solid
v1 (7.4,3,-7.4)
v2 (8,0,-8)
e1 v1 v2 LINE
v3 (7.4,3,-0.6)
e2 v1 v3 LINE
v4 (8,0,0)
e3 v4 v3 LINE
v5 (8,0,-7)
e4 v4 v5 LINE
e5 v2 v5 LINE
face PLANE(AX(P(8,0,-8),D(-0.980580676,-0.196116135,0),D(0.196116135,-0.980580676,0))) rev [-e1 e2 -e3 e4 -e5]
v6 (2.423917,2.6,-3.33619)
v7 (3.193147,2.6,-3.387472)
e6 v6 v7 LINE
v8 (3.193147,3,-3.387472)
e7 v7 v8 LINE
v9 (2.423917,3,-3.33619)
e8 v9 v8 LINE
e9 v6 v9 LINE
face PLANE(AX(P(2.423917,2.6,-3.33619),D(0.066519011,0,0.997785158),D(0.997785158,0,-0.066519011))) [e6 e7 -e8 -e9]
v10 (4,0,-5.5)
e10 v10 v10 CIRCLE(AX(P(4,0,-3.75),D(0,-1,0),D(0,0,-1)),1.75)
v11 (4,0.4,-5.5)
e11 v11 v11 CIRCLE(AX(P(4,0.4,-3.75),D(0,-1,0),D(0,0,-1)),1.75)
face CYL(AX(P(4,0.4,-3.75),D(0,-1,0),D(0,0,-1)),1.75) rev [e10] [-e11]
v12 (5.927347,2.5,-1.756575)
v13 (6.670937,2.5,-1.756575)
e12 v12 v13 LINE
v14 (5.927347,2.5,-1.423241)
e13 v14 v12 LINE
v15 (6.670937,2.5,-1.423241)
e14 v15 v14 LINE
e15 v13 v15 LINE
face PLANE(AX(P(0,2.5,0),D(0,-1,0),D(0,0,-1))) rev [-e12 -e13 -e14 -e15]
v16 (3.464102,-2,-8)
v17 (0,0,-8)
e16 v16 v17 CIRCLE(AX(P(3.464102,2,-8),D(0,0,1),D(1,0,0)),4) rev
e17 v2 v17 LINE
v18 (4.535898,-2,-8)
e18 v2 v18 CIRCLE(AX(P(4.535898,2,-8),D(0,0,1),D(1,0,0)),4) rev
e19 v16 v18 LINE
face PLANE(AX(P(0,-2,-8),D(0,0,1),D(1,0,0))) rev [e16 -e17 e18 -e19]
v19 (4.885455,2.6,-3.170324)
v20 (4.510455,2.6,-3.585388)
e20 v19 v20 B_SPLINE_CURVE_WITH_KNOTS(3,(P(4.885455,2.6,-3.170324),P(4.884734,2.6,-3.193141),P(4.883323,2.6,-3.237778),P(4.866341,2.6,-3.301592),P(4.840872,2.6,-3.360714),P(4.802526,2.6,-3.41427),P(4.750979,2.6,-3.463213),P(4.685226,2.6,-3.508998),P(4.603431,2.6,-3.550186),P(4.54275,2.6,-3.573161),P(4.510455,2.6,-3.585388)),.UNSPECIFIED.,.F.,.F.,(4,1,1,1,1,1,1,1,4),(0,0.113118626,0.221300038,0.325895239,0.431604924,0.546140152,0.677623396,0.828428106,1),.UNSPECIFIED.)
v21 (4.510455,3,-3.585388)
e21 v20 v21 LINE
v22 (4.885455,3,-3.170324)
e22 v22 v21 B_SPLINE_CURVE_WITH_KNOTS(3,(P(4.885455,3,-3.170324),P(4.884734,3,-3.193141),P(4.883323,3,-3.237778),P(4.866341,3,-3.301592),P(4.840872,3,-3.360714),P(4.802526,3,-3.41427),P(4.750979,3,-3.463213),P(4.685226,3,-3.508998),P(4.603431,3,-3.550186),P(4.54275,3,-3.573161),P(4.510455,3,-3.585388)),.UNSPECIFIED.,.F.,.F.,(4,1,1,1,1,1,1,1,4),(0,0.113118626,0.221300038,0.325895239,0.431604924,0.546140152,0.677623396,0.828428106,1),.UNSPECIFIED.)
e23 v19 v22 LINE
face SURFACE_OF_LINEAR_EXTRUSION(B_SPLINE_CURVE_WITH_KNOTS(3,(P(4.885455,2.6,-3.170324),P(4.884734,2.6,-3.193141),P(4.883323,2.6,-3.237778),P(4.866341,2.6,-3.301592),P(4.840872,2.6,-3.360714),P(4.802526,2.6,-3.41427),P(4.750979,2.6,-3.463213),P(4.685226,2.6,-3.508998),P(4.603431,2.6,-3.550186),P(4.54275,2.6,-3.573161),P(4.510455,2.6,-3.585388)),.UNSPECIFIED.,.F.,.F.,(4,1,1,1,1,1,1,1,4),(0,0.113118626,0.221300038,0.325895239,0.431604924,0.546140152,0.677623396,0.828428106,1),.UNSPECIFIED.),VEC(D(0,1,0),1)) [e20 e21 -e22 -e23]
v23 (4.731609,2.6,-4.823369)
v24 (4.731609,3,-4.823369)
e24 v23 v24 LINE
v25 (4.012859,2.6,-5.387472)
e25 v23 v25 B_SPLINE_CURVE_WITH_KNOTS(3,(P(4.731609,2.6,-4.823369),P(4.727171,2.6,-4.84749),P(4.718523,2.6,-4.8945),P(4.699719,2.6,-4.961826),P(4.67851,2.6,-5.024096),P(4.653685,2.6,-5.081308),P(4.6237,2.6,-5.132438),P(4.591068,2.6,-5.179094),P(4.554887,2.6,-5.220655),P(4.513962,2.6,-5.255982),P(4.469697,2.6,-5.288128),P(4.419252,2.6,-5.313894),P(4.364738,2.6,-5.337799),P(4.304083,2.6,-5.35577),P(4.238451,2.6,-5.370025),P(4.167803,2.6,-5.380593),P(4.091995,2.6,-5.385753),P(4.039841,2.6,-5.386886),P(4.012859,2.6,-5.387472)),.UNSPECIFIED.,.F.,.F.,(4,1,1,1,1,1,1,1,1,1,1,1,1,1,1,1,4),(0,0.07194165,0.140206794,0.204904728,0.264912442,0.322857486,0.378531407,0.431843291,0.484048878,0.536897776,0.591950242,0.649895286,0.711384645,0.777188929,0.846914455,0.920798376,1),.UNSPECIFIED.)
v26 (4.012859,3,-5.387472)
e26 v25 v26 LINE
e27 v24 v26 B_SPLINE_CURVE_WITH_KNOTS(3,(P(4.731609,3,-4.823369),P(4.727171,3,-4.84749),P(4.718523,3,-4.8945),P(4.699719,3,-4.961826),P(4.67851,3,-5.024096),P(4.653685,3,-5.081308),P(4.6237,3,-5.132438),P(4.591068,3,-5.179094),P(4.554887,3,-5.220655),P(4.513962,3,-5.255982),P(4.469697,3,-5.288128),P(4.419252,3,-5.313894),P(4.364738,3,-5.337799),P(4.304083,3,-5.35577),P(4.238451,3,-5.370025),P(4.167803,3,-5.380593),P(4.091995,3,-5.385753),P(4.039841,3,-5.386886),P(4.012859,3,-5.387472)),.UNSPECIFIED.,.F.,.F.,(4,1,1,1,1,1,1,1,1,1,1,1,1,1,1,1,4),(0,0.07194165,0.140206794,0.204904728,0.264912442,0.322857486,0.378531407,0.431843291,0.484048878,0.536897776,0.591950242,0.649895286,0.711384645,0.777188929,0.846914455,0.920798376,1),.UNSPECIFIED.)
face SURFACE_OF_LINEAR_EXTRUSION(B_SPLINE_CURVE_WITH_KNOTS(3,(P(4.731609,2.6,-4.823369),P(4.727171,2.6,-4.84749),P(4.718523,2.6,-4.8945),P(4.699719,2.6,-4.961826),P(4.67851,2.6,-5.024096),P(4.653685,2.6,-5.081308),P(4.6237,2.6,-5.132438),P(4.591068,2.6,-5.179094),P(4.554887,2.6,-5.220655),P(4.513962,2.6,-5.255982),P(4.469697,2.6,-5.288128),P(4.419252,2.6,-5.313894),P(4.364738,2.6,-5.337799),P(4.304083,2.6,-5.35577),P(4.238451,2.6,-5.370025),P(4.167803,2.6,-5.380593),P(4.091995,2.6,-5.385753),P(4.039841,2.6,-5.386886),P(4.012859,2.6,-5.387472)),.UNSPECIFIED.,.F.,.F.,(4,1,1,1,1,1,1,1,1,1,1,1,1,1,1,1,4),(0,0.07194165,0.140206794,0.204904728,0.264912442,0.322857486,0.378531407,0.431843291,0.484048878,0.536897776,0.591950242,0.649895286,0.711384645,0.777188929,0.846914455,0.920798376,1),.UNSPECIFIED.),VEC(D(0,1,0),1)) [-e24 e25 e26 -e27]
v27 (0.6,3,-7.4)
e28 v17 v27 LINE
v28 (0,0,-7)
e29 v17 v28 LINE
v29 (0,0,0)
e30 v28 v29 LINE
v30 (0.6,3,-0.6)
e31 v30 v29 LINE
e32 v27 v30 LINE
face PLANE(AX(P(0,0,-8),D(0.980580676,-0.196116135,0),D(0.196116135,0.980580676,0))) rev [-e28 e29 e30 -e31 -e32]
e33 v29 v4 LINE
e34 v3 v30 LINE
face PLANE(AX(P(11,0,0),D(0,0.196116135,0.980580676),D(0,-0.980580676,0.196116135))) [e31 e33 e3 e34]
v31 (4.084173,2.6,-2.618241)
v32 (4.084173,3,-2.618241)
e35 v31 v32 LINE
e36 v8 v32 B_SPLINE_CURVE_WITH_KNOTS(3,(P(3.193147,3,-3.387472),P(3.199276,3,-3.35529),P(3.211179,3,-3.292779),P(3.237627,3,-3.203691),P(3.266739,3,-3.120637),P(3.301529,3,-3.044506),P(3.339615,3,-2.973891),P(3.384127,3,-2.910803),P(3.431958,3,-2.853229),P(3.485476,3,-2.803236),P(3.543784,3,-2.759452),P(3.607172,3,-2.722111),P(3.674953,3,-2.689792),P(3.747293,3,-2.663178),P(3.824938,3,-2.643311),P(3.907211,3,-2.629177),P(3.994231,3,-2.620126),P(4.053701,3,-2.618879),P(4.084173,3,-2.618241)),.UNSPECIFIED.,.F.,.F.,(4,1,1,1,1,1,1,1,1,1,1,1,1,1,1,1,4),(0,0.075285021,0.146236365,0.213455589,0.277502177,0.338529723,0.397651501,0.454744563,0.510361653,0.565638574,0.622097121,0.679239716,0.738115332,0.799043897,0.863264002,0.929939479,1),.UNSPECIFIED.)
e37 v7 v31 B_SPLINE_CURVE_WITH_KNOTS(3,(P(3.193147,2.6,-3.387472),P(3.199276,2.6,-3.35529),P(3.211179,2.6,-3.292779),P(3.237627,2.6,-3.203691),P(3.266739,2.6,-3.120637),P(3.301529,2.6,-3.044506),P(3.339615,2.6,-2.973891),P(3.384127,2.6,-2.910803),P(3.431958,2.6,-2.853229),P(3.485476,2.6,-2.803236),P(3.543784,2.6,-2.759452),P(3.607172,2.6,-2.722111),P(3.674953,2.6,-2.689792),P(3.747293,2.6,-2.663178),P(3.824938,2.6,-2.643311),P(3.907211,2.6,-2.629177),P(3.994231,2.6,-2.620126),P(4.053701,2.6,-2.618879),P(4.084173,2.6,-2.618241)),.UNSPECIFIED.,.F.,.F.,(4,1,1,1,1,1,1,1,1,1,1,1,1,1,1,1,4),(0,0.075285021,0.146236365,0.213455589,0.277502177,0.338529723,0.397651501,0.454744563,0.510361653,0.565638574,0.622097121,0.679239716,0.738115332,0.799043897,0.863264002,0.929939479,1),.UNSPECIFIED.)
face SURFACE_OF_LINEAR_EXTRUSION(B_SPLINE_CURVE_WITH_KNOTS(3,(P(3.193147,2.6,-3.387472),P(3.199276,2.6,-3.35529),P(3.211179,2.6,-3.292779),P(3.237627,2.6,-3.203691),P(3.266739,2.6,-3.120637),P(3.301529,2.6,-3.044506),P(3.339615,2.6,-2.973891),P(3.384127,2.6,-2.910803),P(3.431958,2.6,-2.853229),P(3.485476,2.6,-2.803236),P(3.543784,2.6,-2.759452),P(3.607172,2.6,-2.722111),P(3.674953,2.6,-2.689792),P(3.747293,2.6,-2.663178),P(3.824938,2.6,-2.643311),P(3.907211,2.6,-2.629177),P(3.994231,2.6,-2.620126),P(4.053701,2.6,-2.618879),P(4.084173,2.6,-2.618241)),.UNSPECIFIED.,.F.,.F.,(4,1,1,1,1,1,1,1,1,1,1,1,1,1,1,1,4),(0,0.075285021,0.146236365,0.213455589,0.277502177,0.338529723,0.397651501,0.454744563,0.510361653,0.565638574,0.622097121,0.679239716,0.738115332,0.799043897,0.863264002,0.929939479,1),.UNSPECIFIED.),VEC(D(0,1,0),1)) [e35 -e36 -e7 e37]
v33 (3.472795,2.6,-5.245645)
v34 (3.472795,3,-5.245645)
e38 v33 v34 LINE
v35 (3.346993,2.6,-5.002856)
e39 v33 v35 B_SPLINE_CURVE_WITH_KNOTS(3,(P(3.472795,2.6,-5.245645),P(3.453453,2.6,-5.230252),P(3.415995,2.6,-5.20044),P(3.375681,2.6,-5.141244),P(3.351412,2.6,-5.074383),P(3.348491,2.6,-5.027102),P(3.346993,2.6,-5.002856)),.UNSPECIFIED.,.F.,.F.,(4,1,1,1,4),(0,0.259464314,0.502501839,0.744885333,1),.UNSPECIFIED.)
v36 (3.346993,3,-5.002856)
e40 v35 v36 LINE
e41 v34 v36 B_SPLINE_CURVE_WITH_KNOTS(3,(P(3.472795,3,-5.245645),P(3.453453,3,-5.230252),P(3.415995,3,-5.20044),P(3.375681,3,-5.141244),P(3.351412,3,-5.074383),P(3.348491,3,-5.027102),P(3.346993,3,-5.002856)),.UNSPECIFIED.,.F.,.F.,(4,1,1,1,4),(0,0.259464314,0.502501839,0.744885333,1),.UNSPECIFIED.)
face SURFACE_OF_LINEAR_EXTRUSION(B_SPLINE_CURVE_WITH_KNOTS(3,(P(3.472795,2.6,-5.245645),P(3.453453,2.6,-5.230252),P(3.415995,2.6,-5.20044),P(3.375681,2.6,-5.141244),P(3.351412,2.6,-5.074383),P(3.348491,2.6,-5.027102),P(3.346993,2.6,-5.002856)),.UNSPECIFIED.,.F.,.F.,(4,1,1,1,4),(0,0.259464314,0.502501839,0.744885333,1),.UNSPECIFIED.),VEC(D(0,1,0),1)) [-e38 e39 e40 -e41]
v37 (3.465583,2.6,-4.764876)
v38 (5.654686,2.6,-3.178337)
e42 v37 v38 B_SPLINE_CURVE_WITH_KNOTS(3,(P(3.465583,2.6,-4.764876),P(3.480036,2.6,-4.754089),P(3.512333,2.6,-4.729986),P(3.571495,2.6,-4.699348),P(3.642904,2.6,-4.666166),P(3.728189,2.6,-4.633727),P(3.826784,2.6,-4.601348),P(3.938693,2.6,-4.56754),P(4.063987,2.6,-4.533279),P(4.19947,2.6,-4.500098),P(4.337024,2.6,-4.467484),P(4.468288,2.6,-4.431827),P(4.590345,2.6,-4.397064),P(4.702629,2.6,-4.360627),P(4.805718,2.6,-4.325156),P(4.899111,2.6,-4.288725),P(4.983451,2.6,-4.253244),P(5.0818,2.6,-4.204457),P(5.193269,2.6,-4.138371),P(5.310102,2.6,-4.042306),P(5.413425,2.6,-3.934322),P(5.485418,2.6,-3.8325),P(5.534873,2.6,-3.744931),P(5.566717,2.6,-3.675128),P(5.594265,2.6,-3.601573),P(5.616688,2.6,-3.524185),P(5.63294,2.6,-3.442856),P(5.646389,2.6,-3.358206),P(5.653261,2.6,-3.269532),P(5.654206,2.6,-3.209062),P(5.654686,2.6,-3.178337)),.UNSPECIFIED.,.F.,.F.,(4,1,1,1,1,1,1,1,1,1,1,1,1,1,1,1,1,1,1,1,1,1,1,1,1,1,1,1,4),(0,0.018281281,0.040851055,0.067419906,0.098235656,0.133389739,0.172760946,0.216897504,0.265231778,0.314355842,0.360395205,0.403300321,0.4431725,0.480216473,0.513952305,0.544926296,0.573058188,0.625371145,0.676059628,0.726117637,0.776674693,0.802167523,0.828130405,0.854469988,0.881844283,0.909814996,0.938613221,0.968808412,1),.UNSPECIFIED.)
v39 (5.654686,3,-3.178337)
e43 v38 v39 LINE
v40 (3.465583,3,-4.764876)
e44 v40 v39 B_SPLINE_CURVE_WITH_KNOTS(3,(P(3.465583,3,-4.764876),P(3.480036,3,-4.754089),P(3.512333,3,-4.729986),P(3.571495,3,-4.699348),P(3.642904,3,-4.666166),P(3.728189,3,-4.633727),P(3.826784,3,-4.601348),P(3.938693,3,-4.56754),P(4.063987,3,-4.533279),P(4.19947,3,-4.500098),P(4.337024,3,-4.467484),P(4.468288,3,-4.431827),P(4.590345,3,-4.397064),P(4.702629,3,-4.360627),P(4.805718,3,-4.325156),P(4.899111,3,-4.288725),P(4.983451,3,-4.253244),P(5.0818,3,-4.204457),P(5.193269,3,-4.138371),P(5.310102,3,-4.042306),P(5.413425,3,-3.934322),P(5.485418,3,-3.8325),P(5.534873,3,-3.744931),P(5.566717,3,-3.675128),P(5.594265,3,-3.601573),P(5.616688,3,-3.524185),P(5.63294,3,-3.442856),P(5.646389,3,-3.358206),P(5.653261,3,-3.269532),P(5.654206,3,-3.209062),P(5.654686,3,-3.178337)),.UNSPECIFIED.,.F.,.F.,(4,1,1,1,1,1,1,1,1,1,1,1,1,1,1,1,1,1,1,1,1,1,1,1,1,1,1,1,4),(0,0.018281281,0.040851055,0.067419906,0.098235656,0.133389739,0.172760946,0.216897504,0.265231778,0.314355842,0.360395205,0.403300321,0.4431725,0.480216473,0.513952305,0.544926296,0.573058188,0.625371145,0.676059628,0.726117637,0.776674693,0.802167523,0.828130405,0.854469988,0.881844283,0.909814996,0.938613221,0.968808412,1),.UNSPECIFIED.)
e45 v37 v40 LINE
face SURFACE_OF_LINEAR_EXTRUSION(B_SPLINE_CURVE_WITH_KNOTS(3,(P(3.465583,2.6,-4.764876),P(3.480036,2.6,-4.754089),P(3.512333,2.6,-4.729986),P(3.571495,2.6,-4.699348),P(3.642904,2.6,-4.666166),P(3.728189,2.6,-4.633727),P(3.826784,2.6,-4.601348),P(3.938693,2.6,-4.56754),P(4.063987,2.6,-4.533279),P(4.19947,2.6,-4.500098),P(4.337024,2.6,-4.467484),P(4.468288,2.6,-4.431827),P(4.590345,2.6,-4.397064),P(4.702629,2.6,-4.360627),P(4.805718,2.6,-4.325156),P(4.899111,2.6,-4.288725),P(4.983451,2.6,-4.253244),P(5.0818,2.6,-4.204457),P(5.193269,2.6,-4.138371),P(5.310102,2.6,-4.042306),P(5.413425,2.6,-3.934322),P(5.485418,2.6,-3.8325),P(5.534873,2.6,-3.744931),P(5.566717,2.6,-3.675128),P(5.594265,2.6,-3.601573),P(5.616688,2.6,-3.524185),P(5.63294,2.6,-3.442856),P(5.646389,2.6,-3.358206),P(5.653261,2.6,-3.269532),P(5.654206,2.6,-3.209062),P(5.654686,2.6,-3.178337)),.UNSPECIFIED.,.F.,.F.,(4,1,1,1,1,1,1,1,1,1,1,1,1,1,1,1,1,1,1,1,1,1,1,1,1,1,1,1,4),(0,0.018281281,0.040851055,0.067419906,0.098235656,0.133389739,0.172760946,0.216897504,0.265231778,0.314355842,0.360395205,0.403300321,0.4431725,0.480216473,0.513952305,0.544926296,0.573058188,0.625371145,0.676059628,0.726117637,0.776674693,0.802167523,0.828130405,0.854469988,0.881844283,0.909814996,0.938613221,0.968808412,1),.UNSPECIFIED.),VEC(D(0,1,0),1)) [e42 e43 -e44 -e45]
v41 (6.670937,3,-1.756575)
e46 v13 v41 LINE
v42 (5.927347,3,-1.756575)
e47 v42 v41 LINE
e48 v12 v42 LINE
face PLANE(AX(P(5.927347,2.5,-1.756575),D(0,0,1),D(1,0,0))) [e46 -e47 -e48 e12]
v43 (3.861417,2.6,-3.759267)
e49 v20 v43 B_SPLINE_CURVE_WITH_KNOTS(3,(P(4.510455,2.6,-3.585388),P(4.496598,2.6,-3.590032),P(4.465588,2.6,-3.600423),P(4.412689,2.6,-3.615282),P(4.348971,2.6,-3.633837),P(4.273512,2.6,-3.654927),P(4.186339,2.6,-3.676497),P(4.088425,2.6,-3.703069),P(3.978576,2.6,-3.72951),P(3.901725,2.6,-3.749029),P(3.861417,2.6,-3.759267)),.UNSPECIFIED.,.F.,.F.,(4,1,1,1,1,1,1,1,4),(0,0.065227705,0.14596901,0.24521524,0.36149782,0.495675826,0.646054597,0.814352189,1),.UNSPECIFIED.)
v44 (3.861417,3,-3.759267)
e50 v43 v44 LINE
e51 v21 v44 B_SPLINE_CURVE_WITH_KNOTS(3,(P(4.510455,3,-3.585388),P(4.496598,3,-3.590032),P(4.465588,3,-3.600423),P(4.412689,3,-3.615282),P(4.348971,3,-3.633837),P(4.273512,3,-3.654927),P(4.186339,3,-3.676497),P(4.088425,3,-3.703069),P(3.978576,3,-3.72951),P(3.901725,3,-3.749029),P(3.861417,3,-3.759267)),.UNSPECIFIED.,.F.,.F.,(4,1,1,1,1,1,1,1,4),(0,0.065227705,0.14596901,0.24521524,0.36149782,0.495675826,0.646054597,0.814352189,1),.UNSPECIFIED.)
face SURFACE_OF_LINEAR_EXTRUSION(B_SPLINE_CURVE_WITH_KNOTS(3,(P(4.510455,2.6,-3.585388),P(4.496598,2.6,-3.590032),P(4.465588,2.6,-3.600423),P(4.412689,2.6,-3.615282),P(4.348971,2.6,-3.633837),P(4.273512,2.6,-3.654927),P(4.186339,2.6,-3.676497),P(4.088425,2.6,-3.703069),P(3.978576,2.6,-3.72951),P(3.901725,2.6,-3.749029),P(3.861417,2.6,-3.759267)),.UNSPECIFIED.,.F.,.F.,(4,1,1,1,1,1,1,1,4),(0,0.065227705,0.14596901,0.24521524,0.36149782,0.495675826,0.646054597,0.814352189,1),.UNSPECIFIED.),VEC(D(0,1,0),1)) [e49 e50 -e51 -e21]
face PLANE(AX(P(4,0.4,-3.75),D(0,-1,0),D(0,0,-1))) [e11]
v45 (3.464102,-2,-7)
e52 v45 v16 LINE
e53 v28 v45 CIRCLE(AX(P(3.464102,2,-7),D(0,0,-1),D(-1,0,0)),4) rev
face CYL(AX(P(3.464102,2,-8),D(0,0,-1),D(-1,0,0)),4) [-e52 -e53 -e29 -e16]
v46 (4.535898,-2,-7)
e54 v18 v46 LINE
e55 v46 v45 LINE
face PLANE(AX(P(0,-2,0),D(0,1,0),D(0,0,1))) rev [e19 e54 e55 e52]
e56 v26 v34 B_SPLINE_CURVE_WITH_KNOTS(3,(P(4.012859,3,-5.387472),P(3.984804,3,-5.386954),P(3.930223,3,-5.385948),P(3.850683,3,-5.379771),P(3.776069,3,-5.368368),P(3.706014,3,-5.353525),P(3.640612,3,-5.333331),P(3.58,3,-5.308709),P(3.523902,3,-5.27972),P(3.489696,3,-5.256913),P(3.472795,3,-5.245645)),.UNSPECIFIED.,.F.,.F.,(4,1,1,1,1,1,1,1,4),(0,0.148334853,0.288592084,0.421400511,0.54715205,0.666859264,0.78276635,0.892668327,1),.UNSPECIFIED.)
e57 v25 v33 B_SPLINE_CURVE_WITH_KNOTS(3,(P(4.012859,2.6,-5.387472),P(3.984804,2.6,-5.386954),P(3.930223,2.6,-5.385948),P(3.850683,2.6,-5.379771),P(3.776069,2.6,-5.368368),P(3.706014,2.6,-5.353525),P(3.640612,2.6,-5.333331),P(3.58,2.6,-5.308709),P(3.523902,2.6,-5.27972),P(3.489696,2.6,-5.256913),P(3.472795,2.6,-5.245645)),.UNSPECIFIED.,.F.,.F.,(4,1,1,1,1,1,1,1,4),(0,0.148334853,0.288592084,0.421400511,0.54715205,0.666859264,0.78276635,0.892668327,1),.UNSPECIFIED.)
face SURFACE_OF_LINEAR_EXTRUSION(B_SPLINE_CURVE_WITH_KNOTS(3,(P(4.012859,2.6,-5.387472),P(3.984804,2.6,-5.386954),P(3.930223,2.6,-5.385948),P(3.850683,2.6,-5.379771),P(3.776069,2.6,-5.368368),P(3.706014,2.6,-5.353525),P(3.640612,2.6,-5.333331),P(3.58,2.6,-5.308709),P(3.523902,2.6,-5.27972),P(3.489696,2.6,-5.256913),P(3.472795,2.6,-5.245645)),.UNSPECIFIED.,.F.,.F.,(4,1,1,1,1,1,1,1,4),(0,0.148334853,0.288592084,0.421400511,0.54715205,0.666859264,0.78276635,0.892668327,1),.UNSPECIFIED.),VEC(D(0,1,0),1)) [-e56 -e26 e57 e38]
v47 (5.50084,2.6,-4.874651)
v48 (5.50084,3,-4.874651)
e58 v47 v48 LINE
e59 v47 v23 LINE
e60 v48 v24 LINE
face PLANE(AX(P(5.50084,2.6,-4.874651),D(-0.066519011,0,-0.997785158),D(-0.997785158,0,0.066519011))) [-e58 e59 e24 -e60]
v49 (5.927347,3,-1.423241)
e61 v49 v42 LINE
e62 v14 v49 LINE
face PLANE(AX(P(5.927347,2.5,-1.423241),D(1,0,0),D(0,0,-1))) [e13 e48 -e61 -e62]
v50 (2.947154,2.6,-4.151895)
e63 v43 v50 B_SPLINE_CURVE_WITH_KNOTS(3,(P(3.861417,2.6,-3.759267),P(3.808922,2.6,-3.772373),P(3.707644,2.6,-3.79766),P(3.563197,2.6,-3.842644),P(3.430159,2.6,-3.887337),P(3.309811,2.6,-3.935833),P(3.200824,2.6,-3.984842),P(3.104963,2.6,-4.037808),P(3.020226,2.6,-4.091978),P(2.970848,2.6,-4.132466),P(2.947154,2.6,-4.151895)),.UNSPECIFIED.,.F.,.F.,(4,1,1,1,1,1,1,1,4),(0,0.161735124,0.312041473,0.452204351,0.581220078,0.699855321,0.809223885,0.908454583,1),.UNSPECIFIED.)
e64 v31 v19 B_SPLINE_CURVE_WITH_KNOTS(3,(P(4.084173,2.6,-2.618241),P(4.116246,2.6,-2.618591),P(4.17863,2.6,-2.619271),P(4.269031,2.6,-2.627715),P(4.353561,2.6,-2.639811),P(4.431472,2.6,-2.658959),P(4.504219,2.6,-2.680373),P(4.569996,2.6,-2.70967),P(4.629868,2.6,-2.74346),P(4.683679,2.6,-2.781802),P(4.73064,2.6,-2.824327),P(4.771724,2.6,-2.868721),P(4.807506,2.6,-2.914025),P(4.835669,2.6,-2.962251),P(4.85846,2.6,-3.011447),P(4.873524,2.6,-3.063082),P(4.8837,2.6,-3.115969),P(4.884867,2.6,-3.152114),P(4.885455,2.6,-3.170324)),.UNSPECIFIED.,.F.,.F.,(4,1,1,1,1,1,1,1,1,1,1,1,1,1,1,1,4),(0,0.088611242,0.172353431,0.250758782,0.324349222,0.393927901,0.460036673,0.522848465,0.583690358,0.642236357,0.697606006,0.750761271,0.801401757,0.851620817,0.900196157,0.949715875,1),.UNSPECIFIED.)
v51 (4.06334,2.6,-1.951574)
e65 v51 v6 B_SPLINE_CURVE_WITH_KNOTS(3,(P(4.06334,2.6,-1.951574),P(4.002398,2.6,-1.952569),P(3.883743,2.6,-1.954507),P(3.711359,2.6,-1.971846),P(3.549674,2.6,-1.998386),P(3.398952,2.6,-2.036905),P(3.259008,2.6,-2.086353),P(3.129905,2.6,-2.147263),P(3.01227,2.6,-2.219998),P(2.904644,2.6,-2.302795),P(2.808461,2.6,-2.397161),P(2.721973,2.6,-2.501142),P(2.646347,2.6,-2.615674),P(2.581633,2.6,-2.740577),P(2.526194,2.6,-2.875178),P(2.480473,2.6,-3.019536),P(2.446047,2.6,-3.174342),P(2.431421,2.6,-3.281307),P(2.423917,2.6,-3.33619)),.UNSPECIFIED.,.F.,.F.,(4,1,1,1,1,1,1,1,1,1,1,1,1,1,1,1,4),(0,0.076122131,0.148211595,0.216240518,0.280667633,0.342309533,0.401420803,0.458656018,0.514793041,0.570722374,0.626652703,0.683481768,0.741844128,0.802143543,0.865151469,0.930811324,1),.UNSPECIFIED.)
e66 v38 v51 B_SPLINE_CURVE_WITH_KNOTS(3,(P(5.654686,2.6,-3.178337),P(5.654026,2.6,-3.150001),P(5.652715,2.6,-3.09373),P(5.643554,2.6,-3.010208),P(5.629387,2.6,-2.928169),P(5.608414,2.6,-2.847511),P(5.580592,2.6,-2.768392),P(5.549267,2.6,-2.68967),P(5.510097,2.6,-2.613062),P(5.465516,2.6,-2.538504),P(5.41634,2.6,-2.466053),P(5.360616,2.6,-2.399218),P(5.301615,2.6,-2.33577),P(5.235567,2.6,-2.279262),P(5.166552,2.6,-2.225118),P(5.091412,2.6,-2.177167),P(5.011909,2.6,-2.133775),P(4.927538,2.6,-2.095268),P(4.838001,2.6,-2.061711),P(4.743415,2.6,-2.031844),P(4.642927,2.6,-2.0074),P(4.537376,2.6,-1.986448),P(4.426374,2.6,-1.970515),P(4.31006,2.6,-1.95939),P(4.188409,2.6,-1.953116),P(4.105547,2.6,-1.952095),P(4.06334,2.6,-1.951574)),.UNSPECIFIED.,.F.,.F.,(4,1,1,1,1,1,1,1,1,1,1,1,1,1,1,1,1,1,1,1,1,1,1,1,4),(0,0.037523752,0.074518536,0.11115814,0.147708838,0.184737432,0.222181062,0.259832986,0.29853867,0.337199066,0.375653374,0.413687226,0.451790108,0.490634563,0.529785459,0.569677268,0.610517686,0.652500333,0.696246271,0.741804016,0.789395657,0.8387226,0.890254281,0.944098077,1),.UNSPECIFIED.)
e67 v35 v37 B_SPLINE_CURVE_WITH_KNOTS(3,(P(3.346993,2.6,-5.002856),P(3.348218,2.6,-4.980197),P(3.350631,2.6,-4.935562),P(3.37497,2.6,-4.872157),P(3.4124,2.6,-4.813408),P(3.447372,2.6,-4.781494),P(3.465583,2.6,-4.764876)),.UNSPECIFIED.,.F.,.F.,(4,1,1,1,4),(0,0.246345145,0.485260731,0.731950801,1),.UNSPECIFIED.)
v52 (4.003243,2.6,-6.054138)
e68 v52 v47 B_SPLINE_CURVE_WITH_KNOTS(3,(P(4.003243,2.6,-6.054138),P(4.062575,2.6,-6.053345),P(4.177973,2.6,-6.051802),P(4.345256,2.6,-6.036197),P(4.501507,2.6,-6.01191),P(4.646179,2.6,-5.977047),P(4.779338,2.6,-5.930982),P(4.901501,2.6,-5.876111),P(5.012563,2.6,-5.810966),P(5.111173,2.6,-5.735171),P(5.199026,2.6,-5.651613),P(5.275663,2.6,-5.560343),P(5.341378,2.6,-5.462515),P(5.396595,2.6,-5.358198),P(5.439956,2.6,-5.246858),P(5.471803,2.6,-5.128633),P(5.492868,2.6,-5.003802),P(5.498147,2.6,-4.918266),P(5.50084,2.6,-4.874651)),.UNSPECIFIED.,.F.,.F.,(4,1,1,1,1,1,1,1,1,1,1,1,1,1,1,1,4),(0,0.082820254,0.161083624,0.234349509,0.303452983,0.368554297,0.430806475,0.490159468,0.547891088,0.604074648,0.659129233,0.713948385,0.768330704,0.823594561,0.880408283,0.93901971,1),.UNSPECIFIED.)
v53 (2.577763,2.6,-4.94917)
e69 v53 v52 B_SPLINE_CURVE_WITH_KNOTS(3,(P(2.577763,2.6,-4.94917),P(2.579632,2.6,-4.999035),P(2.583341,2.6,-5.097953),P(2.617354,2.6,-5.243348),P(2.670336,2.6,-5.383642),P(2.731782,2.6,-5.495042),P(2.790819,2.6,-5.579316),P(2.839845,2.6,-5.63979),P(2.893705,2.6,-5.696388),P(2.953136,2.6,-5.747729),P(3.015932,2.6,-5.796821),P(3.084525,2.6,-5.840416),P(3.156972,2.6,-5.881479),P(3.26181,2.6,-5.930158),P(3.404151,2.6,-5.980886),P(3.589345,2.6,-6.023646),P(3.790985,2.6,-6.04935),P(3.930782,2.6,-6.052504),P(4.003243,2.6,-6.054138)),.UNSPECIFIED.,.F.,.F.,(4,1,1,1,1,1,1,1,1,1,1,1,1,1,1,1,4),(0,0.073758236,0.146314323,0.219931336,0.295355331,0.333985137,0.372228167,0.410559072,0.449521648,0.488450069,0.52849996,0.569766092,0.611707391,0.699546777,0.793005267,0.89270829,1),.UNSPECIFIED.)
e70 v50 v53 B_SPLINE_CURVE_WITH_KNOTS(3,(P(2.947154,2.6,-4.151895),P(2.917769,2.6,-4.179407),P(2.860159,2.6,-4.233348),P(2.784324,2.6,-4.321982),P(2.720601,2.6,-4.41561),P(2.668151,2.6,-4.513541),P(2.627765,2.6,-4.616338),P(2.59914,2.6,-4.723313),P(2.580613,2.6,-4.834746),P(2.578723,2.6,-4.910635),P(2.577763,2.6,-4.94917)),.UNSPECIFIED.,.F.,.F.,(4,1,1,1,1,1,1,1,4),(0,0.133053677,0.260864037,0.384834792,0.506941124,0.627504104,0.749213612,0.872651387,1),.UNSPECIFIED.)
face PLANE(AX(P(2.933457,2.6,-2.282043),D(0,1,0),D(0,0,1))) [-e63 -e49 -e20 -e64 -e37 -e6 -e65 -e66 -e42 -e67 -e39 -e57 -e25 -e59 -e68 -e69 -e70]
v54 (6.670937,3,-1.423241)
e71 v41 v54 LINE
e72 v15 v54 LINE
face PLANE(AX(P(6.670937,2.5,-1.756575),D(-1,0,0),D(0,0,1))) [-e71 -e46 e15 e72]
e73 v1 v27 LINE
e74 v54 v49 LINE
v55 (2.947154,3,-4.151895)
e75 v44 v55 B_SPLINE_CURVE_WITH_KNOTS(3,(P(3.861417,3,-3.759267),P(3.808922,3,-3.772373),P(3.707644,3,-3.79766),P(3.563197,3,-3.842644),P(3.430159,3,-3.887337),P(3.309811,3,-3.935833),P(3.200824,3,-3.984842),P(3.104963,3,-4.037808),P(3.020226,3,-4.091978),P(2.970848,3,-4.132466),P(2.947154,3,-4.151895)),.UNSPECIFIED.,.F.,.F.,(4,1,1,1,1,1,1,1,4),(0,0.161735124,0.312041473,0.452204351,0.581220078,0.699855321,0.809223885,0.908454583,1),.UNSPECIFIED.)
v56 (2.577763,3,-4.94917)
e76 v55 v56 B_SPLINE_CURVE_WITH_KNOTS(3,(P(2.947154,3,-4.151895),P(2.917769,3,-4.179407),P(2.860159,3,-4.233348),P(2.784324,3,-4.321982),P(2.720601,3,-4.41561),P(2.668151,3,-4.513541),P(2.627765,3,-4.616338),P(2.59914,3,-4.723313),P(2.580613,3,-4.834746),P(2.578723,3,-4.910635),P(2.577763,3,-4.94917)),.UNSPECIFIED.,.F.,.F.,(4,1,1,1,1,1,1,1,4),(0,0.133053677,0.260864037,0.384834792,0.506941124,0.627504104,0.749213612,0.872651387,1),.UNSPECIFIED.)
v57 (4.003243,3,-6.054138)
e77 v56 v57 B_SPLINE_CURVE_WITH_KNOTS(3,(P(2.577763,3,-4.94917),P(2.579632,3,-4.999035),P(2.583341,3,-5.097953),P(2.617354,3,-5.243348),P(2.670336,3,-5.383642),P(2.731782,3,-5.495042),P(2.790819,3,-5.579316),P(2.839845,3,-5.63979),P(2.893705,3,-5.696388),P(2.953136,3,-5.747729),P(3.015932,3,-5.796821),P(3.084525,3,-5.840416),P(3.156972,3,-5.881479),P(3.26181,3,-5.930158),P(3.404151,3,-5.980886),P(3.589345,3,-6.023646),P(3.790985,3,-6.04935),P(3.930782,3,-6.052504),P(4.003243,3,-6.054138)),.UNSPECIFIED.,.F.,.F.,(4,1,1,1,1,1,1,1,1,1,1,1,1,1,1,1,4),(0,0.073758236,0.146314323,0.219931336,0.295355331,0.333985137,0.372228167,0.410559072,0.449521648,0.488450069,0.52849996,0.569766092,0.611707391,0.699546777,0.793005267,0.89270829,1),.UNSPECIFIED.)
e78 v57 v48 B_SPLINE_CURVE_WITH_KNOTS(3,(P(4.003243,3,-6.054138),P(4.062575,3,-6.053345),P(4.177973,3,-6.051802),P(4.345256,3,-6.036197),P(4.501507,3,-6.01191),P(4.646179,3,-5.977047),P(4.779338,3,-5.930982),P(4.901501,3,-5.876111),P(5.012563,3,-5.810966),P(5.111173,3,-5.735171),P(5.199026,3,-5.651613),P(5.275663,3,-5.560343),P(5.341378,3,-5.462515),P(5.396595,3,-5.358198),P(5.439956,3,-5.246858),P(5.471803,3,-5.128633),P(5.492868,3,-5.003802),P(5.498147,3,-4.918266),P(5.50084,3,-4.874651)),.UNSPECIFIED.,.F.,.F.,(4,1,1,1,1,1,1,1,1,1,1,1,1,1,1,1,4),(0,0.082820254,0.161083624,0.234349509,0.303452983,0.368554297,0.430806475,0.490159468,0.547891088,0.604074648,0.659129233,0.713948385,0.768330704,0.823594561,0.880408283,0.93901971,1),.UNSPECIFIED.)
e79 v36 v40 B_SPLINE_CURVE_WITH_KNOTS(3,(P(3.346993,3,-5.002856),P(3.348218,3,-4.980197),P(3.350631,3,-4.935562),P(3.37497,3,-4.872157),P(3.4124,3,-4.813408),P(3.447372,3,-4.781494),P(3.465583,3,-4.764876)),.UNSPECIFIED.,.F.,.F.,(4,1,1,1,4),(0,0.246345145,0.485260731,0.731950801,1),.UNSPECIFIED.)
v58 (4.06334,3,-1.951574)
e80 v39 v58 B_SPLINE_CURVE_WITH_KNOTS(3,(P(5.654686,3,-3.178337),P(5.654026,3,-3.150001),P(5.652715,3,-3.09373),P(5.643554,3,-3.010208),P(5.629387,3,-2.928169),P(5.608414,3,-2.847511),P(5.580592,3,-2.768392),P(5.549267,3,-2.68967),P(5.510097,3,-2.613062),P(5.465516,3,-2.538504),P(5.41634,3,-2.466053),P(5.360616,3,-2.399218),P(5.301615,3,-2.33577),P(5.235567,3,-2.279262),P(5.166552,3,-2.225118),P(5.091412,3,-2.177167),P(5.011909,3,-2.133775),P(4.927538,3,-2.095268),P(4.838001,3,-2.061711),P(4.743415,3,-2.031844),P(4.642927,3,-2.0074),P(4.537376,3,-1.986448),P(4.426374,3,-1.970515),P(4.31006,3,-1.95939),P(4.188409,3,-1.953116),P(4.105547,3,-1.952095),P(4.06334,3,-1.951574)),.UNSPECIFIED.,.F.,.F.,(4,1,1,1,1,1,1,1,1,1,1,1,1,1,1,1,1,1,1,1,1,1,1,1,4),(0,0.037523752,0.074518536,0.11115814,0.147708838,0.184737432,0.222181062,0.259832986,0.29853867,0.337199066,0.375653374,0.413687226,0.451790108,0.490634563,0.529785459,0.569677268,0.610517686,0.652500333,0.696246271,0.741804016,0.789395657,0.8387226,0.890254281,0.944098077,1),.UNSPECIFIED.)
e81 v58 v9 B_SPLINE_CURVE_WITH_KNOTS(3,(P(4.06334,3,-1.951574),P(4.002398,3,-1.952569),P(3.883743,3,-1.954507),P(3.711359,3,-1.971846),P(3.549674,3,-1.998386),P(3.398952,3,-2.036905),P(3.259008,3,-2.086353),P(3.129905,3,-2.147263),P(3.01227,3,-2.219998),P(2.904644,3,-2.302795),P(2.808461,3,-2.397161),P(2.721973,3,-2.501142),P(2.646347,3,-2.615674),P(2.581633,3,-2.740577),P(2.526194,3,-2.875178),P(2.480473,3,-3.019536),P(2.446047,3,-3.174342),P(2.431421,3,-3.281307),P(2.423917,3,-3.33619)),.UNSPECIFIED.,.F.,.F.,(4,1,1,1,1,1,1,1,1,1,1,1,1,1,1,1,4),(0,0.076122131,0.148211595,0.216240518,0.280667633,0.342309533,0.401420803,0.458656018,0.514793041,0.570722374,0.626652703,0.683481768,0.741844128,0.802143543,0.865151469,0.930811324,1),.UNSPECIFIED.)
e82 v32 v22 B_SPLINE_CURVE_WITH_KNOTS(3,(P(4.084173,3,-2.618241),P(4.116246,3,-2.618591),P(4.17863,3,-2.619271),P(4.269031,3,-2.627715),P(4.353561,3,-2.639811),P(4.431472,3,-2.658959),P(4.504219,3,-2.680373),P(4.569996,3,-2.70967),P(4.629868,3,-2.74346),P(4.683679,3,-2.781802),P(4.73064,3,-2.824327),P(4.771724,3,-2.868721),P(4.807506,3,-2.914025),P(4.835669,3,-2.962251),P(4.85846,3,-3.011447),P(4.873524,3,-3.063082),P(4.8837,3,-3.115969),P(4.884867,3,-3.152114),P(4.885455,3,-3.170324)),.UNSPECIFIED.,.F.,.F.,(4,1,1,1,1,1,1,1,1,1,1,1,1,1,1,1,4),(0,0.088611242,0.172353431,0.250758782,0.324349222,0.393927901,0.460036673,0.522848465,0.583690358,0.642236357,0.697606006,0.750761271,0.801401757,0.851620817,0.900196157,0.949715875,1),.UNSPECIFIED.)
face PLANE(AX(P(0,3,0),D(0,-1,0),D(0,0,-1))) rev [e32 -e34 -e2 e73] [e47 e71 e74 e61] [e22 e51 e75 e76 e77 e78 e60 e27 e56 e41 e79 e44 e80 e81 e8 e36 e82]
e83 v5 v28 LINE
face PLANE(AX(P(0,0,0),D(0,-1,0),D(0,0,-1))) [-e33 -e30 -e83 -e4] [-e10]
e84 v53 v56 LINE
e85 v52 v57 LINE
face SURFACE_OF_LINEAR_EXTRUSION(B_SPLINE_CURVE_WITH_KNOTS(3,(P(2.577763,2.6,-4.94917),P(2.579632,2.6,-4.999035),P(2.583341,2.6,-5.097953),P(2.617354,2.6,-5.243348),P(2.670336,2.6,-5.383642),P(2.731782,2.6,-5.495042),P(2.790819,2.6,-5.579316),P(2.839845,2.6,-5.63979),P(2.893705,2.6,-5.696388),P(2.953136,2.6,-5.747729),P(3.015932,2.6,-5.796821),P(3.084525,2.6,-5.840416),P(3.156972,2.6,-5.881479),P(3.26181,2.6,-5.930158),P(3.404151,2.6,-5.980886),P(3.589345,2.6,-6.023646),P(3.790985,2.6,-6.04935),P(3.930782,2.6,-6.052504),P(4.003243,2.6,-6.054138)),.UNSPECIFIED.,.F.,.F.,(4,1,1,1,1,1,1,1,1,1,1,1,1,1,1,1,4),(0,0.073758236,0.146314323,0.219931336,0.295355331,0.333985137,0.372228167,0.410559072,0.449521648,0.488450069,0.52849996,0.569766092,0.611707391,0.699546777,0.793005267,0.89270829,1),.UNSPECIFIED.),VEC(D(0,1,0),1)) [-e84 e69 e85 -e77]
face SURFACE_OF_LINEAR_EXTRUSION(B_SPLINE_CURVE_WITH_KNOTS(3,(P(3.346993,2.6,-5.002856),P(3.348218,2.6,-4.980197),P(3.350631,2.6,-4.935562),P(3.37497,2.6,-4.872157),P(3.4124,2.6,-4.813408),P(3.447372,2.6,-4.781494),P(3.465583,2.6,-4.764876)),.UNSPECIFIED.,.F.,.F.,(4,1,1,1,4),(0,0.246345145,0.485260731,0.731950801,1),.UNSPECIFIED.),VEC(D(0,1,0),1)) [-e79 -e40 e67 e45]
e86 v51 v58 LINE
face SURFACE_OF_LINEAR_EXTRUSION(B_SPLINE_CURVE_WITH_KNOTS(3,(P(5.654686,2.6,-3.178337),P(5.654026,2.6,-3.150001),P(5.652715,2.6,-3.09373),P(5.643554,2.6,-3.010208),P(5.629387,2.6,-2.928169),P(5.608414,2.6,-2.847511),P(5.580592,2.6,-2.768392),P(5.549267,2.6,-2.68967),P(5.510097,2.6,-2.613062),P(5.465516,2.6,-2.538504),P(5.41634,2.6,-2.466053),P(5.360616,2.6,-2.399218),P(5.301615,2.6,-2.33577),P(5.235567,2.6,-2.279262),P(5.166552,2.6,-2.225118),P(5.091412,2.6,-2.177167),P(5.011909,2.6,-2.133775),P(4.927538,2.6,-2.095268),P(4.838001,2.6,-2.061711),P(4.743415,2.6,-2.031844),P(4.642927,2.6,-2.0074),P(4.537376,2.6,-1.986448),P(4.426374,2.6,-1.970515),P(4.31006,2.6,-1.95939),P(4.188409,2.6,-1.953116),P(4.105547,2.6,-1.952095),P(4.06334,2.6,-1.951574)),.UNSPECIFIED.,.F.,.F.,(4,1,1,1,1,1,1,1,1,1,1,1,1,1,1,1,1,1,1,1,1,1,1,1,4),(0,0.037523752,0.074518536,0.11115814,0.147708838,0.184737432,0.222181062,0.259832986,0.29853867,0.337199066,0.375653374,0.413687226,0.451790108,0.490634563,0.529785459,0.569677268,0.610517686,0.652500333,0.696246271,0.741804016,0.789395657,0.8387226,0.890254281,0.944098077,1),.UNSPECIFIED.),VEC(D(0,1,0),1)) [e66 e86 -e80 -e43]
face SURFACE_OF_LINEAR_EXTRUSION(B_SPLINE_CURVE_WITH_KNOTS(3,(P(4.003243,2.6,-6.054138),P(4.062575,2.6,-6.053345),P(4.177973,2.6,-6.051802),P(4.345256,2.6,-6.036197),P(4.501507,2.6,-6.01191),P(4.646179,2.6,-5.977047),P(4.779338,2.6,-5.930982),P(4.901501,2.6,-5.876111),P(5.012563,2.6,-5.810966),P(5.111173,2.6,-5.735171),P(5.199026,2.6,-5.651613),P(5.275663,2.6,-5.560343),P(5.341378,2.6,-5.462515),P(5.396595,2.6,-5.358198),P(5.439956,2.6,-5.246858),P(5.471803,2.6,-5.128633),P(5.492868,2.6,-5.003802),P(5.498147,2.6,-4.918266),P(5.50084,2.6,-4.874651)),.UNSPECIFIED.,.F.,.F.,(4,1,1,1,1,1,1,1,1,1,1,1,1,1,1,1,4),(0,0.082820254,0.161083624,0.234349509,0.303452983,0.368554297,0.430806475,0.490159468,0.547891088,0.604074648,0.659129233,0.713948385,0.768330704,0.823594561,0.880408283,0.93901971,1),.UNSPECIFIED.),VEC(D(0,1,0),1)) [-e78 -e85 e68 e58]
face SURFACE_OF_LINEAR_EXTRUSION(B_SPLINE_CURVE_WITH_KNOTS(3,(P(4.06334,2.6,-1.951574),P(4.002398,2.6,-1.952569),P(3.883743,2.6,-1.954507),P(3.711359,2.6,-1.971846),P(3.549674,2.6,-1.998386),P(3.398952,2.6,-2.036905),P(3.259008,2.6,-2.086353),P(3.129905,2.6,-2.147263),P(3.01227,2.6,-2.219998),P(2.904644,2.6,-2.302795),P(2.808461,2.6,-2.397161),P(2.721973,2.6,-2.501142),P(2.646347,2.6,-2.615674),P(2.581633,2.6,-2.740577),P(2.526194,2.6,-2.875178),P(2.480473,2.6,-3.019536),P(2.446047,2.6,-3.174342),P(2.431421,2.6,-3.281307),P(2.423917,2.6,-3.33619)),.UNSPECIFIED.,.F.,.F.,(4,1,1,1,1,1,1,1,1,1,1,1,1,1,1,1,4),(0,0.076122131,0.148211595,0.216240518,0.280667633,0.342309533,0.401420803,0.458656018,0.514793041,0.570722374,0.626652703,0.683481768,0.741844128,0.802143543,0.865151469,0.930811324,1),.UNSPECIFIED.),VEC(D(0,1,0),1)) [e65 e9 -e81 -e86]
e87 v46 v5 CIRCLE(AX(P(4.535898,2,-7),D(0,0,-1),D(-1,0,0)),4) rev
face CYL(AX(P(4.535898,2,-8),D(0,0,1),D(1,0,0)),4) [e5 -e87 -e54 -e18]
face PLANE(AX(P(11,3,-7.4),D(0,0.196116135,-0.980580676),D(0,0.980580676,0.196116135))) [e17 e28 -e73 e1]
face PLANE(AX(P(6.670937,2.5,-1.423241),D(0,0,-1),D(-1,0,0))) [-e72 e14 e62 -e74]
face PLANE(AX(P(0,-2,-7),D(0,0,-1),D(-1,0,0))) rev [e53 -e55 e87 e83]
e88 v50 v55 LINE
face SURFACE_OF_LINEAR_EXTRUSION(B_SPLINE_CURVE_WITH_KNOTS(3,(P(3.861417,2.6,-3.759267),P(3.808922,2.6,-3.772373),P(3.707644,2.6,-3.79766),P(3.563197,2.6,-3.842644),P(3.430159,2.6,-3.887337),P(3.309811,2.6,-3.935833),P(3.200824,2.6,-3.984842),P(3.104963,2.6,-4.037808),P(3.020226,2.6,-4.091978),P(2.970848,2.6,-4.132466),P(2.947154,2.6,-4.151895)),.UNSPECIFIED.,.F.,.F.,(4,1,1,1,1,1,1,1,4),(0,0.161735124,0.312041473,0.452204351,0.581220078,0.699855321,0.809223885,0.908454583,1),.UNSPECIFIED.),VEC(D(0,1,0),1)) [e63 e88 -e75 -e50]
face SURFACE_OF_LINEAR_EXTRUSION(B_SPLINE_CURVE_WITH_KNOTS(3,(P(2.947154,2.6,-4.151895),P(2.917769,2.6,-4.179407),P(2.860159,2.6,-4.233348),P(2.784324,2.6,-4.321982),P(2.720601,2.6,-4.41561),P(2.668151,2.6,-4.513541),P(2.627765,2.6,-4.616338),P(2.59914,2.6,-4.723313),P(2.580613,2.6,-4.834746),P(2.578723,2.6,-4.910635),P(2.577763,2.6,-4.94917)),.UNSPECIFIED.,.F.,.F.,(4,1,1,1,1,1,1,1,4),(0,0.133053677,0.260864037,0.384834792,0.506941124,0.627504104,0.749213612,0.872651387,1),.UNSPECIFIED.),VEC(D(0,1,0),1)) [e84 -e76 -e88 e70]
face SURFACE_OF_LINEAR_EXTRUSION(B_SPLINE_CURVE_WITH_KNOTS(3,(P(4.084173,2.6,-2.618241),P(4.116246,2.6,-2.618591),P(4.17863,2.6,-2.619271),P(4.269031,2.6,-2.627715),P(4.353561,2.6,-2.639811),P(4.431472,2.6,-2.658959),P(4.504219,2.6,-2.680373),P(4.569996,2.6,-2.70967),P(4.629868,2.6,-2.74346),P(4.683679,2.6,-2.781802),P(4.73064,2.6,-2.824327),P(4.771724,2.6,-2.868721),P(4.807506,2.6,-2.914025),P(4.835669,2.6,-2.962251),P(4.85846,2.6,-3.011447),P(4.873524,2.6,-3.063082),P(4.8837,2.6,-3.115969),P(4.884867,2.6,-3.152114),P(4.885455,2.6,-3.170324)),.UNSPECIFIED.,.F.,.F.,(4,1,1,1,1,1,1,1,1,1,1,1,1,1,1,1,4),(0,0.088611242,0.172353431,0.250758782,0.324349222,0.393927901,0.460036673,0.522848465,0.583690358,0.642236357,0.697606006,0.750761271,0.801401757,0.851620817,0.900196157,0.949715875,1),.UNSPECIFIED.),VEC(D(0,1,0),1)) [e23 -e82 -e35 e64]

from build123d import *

# Parameters (mm, degrees)
SKETCH1_W               = 8
SKETCH1_H               = 8
BOSS_EXTRUDE1_DEPTH     = 3
CUT_EXTRUDE1_DEPTH      = 12.704699911
CUT_EXTRUDE1_DEPTH_BACK = 12.704699911
CUT_EXTRUDE2_DEPTH      = 11
SKETCH4_R               = 1.75
CUT_EXTRUDE3_DEPTH      = 0.4
SKETCH5_W               = 8
SKETCH5_H               = 1
BOSS_EXTRUDE2_DEPTH     = 2
FILLET1_R               = 4
CUT_EXTRUDE4_DEPTH      = 0.4
SKETCH7_W               = 0.743589743
SKETCH7_H               = 0.333333333
CUT_EXTRUDE5_DEPTH      = 0.5


with BuildPart() as part:
    # Sketch1 → Boss-Extrude1 (new body)
    with BuildSketch(Plane(origin=(0, 0, 0), x_dir=(1, 0, 0), z_dir=(0, 1, 0))):
        with Locations((4, 4)):
            Rectangle(SKETCH1_W, SKETCH1_H)
    extrude(amount=BOSS_EXTRUDE1_DEPTH)

    # Sketch2 → Cut-Extrude1 (cut, two sides: drawn at the far end of the back side and taken through both)
    with BuildSketch(Plane.XY.offset(-CUT_EXTRUDE1_DEPTH_BACK)):
        Polygon((0, 0), (0.6, 3), (0, 3), align=None)
        Polygon((8, 0), (7.4, 3), (8, 3), align=None)
    extrude(amount=CUT_EXTRUDE1_DEPTH + CUT_EXTRUDE1_DEPTH_BACK, mode=Mode.SUBTRACT)

    # Sketch3 → Cut-Extrude2 (cut)
    with BuildSketch(Plane(origin=(0, 0, 0), x_dir=(0, 0, -1), z_dir=(1, 0, 0))):
        Polygon((0, 0), (0.6, 3), (0, 3), align=None)
        Polygon((8, 3), (7.4, 3), (8, 0), align=None)
    extrude(amount=CUT_EXTRUDE2_DEPTH, mode=Mode.SUBTRACT)

    # Sketch4 → Cut-Extrude3 (cut)
    with BuildSketch(Plane.XZ):
        with Locations(Location((4, -3.75, 0), (0, 0, 270))):
            Circle(SKETCH4_R)
    extrude(amount=-CUT_EXTRUDE3_DEPTH, mode=Mode.SUBTRACT)

    # Sketch5 → Boss-Extrude2 (add)
    with BuildSketch(Plane.XZ):
        with Locations((4, -7.5)):
            Rectangle(SKETCH5_W, SKETCH5_H)
    extrude(amount=BOSS_EXTRUDE2_DEPTH)

    # Fillet1
    # the kernel refuses this fillet: 4 mm, written as the material it takes off along each edge
    with BuildSketch(Plane(origin=(8, -2, -16.660254038), x_dir=(0, 1, 0), z_dir=(0, 0, 1)), Plane(origin=(0, -2, 1.660254038), x_dir=(0, 1, 0), z_dir=(0, 0, -1))) as fillet1_piece_1:
        with BuildLine():
            CenterArc((4, 3.464101615), FILLET1_R, 180, 60)
            Line((0, 3.464101615), (-0.08, 3.464101615))
            Line((-0.08, 3.464101615), (-0.08, 0))
            Line((-0.08, 0), (0, -0.08))
            ThreePointArc((0, -0.08), (1, -0.08), (1.96, -0.069282032))
            Line((1.96, -0.069282032), (2, 0))
        make_face()
    extrude(amount=18.320508076, mode=Mode.SUBTRACT)

    # Sketch6 → Cut-Extrude4 (cut)
    with BuildSketch(Plane(origin=(0, 3, 0), x_dir=(1, 0, 0), z_dir=(0, 1, 0))):
        with BuildLine():
            Line((2.423916505, 3.336189685), (3.193147274, 3.387471736))
            add(Edge.make_bspline(
                [(3.193147274, 3.387471736), (3.199275518, 3.35528983), (3.211179242, 3.292778523), (3.237627081, 3.203691377), (3.266738832, 3.12063689), (3.30152897, 3.044505684), (3.339615284, 2.973890515), (3.38412658, 2.910803039), (3.431957638, 2.853229033), (3.485476185, 2.803236311), (3.543783948, 2.759451994), (3.607171876, 2.722111271), (3.674953108, 2.6897922), (3.747293374, 2.663178469), (3.824938253, 2.64331119), (3.907211345, 2.629176798), (3.994230643, 2.620125524), (4.053701404, 2.618879435), (4.084172915, 2.618240967)],
                knots=[0, 0, 0, 0, 1.204560339, 2.339781841, 3.415289417, 4.440034832, 5.416475564, 6.362424008, 7.275913008, 8.16578645, 9.05021719, 9.95355393, 10.867835453, 11.809845306, 12.784702352, 13.812224031, 14.87903166, 16, 16, 16, 16], degree=3))
            add(Edge.make_bspline(
                [(4.084172915, 2.618240967), (4.116246108, 2.618590883), (4.178630121, 2.619271489), (4.269031453, 2.627715), (4.353560804, 2.639811238), (4.431471751, 2.6589593), (4.504219207, 2.680373377), (4.569996427, 2.709670116), (4.629867843, 2.743459668), (4.683679212, 2.781802056), (4.730640445, 2.824326515), (4.771724475, 2.86872067), (4.807505951, 2.914025405), (4.835668504, 2.962251146), (4.858460082, 3.011447443), (4.873523718, 3.063081907), (4.883700097, 3.1159689), (4.884867031, 3.152113555), (4.885454967, 3.1703243)],
                knots=[0, 0, 0, 0, 1.417779877, 2.757654889, 4.012140507, 5.189587551, 6.302846416, 7.360586765, 8.365575446, 9.33904572, 10.275781718, 11.161696098, 12.012180333, 12.822428111, 13.625933072, 14.403138519, 15.195454004, 16, 16, 16, 16], degree=3))
            add(Edge.make_bspline(
                [(4.885454967, 3.1703243), (4.884733913, 3.193140887), (4.883323278, 3.237778199), (4.866340641, 3.301592127), (4.840872442, 3.360713887), (4.802526135, 3.41427025), (4.750979261, 3.463212961), (4.685226085, 3.508997669), (4.603431212, 3.550186), (4.542750055, 3.573160928), (4.510454967, 3.585388403)],
                knots=[0, 0, 0, 0, 0.90494901, 1.770400303, 2.607161909, 3.452839393, 4.36912122, 5.420987164, 6.627424851, 8, 8, 8, 8], degree=3))
            add(Edge.make_bspline(
                [(4.510454967, 3.585388403), (4.496597999, 3.590031937), (4.465588357, 3.600423411), (4.4126892, 3.615282239), (4.348970759, 3.633836968), (4.273512264, 3.654927379), (4.186339087, 3.676497317), (4.088424838, 3.703069034), (3.978575834, 3.729510064), (3.901725338, 3.749028827), (3.861416505, 3.759266608)],
                knots=[0, 0, 0, 0, 0.521821638, 1.167752076, 1.961721917, 2.891982557, 3.96540661, 5.168436773, 6.514817513, 8, 8, 8, 8], degree=3))
            add(Edge.make_bspline(
                [(3.861416505, 3.759266608), (3.808922441, 3.772373151), (3.707643728, 3.797660082), (3.563197092, 3.84264374), (3.430159098, 3.887337495), (3.309810688, 3.935832618), (3.200824367, 3.984842463), (3.104963023, 4.037807847), (3.02022624, 4.091978089), (2.970848149, 4.132466251), (2.947153685, 4.151894813)],
                knots=[0, 0, 0, 0, 1.293880989, 2.496331788, 3.617634808, 4.64976062, 5.598842568, 6.473791081, 7.267636666, 8, 8, 8, 8], degree=3))
            add(Edge.make_bspline(
                [(2.947153685, 4.151894813), (2.917769469, 4.179407128), (2.860158996, 4.233347566), (2.784323751, 4.321982057), (2.720601495, 4.415610216), (2.668151102, 4.513540942), (2.627765291, 4.616338017), (2.599140348, 4.723313361), (2.580613245, 4.834746169), (2.578722682, 4.91063455), (2.577762659, 4.949170454)],
                knots=[0, 0, 0, 0, 1.064429417, 2.086912298, 3.078678339, 4.055528992, 5.020032834, 5.993708893, 6.981211098, 8, 8, 8, 8], degree=3))
            add(Edge.make_bspline(
                [(2.577762659, 4.949170454), (2.579632311, 4.999035454), (2.583341142, 5.097952729), (2.617353538, 5.24334762), (2.670335558, 5.383642492), (2.731782138, 5.495041815), (2.790819043, 5.579315825), (2.839844896, 5.639790083), (2.893704531, 5.696388175), (2.953135712, 5.747729494), (3.015931612, 5.796821395), (3.084525186, 5.840415592), (3.156971597, 5.881478913), (3.261809808, 5.93015757), (3.404151332, 5.980885512), (3.589345301, 6.023645948), (3.790984862, 6.049350493), (3.930782191, 6.052503897), (4.003243428, 6.054138403)],
                knots=[0, 0, 0, 0, 1.180131776, 2.341029169, 3.518901375, 4.725685298, 5.343762192, 5.955650671, 6.568945152, 7.192346361, 7.815201106, 8.455999361, 9.116257477, 9.787318263, 11.192748436, 12.688084276, 14.283332633, 16, 16, 16, 16], degree=3))
            add(Edge.make_bspline(
                [(4.003243428, 6.054138403), (4.062574751, 6.053344994), (4.177972905, 6.051801831), (4.345255933, 6.036197125), (4.501507358, 6.011910245), (4.646178875, 5.977046542), (4.779337891, 5.930982439), (4.901500568, 5.876111383), (5.012563098, 5.81096567), (5.111173405, 5.735171454), (5.199025737, 5.651613191), (5.275662846, 5.560343317), (5.341377732, 5.462514514), (5.396594511, 5.358198276), (5.439956101, 5.246858263), (5.471803478, 5.128633406), (5.492867609, 5.003801978), (5.498147397, 4.918266237), (5.500839582, 4.874651223)],
                knots=[0, 0, 0, 0, 1.325124071, 2.577337985, 3.749592149, 4.855247722, 5.896868755, 6.892903601, 7.842551483, 8.766257401, 9.665194363, 10.546067736, 11.423174165, 12.293291263, 13.177512979, 14.086532529, 15.024315359, 16, 16, 16, 16], degree=3))
            Line((5.500839582, 4.874651223), (4.731608813, 4.823369172))
            add(Edge.make_bspline(
                [(4.731608813, 4.823369172), (4.727171315, 4.847490186), (4.718523093, 4.894499533), (4.699719489, 4.96182647), (4.678509937, 5.024096207), (4.653685255, 5.081308344), (4.623700039, 5.13243816), (4.591067506, 5.179094223), (4.554887475, 5.220654869), (4.51396201, 5.255982033), (4.469697485, 5.288128305), (4.419251527, 5.313894286), (4.364737876, 5.337799444), (4.30408262, 5.355770261), (4.238450559, 5.370025359), (4.167803464, 5.380593162), (4.091994892, 5.385752959), (4.039841388, 5.386885694), (4.012858813, 5.387471736)],
                knots=[0, 0, 0, 0, 1.151066407, 2.24330871, 3.278475654, 4.238599069, 5.165719782, 6.056502506, 6.909492653, 7.744782051, 8.590364415, 9.471203867, 10.39832458, 11.382154319, 12.435022857, 13.550631277, 14.73277401, 16, 16, 16, 16], degree=3))
            add(Edge.make_bspline(
                [(4.012858813, 5.387471736), (3.984804304, 5.386954358), (3.930223002, 5.385947775), (3.850683499, 5.379770524), (3.776069477, 5.368367912), (3.706014485, 5.353524542), (3.640612102, 5.333331162), (3.580000346, 5.308708643), (3.523901913, 5.279720359), (3.489695535, 5.256913378), (3.47279471, 5.245644813)],
                knots=[0, 0, 0, 0, 1.186678824, 2.308736671, 3.37120409, 4.377216403, 5.334874112, 6.262130804, 7.141346615, 8, 8, 8, 8], degree=3))
            add(Edge.make_bspline(
                [(3.47279471, 5.245644813), (3.453453136, 5.230251633), (3.415994509, 5.200439822), (3.3756811, 5.141243702), (3.351412335, 5.074383458), (3.348491314, 5.027102037), (3.346993428, 5.002856352)],
                knots=[0, 0, 0, 0, 1.037857257, 2.010007357, 2.979541333, 4, 4, 4, 4], degree=3))
            add(Edge.make_bspline(
                [(3.346993428, 5.002856352), (3.348218426, 4.980197149), (3.350631475, 4.935562125), (3.374970191, 4.872157107), (3.41239982, 4.813407798), (3.447371668, 4.781494404), (3.465583172, 4.764875582)],
                knots=[0, 0, 0, 0, 0.98538058, 1.941042925, 2.927803204, 4, 4, 4, 4], degree=3))
            add(Edge.make_bspline(
                [(3.465583172, 4.764875582), (3.480036346, 4.754089134), (3.512333176, 4.72998591), (3.571494566, 4.699348433), (3.642903916, 4.666166195), (3.728189187, 4.633726893), (3.826783574, 4.601347807), (3.938693075, 4.567540299), (4.063986517, 4.533278892), (4.199470233, 4.500098399), (4.337024364, 4.467483879), (4.46828848, 4.431827004), (4.590345232, 4.397064309), (4.702628677, 4.360627363), (4.805717615, 4.325156109), (4.899111277, 4.288724577), (4.98345094, 4.253244341), (5.081800337, 4.204456503), (5.193269487, 4.138371404), (5.310101731, 4.042305693), (5.413424942, 3.934321559), (5.485417809, 3.83249997), (5.534873142, 3.744930694), (5.566717158, 3.675127784), (5.59426473, 3.601573118), (5.616688379, 3.524185412), (5.632940128, 3.442855773), (5.646389397, 3.358205559), (5.653260877, 3.269531733), (5.654205671, 3.209062493), (5.654685736, 3.178337121)],
                knots=[0, 0, 0, 0, 0.511875881, 1.143829537, 1.88775736, 2.750598373, 3.734912702, 4.837306479, 6.073130119, 7.42648979, 8.801963576, 10.091065733, 11.292408984, 12.408830014, 13.446061236, 14.39066453, 15.257936293, 16.045629259, 17.510392066, 18.929669597, 20.331293837, 21.746891395, 22.460690638, 23.187651344, 23.925159671, 24.69163991, 25.474819891, 26.281170188, 27.126635539, 28, 28, 28, 28], degree=3))
            add(Edge.make_bspline(
                [(5.654685736, 3.178337121), (5.654025632, 3.150001459), (5.652714728, 3.093729578), (5.643553782, 3.010207902), (5.629386607, 2.928169417), (5.608414322, 2.847511277), (5.580592445, 2.768392154), (5.549267222, 2.689670139), (5.510096795, 2.613061996), (5.465515506, 2.538504273), (5.41634032, 2.466052922), (5.360615699, 2.3992182), (5.301614691, 2.335770341), (5.235567289, 2.279262071), (5.166552067, 2.225117883), (5.091412341, 2.177166881), (5.011908526, 2.133775469), (4.927537931, 2.095267608), (4.838001417, 2.061711489), (4.743415274, 2.031844209), (4.642927337, 2.007400135), (4.537375532, 1.986448484), (4.426373586, 1.970515295), (4.310060277, 1.959390224), (4.188409162, 1.953116354), (4.105547428, 1.952094705), (4.063339582, 1.9515743)],
                knots=[0, 0, 0, 0, 0.900570041, 1.788444861, 2.667795364, 3.545012114, 4.433698372, 5.332345486, 6.235991676, 7.164928091, 8.092777575, 9.015680987, 9.928493428, 10.842962589, 11.775229507, 12.714851019, 13.672254427, 14.652424454, 15.660007982, 16.709910502, 17.803296389, 18.945495772, 20.129342395, 21.366102753, 22.658353839, 24, 24, 24, 24], degree=3))
            add(Edge.make_bspline(
                [(4.063339582, 1.9515743), (4.002397965, 1.952569276), (3.883743193, 1.954506517), (3.711359118, 1.971846347), (3.549674268, 1.998386209), (3.398951853, 2.0369045), (3.259007654, 2.086353292), (3.129905498, 2.147263285), (3.012269836, 2.219998383), (2.90464369, 2.302794639), (2.808461007, 2.397160809), (2.721973345, 2.501141662), (2.646347447, 2.615673526), (2.58163302, 2.740577261), (2.526193974, 2.875177636), (2.480472858, 3.01953646), (2.446047261, 3.174342245), (2.431421007, 3.281307488), (2.423916505, 3.336189685)],
                knots=[0, 0, 0, 0, 1.217954099, 2.371385517, 3.459848295, 4.490682126, 5.476952527, 6.422732854, 7.338496285, 8.236688651, 9.131557988, 10.026443255, 10.935708282, 11.869506048, 12.834296687, 13.842423496, 14.892981177, 16, 16, 16, 16], degree=3))
        make_face()
    extrude(amount=-CUT_EXTRUDE4_DEPTH, mode=Mode.SUBTRACT)

    # Sketch7 → Cut-Extrude5 (cut)
    with BuildSketch(Plane(origin=(0, 3, 0), x_dir=(1, 0, 0), z_dir=(0, 1, 0))):
        with Locations((6.299141853, 1.589907949)):
            Rectangle(SKETCH7_W, SKETCH7_H)
    extrude(amount=-CUT_EXTRUDE5_DEPTH, mode=Mode.SUBTRACT)


solid = part.part
